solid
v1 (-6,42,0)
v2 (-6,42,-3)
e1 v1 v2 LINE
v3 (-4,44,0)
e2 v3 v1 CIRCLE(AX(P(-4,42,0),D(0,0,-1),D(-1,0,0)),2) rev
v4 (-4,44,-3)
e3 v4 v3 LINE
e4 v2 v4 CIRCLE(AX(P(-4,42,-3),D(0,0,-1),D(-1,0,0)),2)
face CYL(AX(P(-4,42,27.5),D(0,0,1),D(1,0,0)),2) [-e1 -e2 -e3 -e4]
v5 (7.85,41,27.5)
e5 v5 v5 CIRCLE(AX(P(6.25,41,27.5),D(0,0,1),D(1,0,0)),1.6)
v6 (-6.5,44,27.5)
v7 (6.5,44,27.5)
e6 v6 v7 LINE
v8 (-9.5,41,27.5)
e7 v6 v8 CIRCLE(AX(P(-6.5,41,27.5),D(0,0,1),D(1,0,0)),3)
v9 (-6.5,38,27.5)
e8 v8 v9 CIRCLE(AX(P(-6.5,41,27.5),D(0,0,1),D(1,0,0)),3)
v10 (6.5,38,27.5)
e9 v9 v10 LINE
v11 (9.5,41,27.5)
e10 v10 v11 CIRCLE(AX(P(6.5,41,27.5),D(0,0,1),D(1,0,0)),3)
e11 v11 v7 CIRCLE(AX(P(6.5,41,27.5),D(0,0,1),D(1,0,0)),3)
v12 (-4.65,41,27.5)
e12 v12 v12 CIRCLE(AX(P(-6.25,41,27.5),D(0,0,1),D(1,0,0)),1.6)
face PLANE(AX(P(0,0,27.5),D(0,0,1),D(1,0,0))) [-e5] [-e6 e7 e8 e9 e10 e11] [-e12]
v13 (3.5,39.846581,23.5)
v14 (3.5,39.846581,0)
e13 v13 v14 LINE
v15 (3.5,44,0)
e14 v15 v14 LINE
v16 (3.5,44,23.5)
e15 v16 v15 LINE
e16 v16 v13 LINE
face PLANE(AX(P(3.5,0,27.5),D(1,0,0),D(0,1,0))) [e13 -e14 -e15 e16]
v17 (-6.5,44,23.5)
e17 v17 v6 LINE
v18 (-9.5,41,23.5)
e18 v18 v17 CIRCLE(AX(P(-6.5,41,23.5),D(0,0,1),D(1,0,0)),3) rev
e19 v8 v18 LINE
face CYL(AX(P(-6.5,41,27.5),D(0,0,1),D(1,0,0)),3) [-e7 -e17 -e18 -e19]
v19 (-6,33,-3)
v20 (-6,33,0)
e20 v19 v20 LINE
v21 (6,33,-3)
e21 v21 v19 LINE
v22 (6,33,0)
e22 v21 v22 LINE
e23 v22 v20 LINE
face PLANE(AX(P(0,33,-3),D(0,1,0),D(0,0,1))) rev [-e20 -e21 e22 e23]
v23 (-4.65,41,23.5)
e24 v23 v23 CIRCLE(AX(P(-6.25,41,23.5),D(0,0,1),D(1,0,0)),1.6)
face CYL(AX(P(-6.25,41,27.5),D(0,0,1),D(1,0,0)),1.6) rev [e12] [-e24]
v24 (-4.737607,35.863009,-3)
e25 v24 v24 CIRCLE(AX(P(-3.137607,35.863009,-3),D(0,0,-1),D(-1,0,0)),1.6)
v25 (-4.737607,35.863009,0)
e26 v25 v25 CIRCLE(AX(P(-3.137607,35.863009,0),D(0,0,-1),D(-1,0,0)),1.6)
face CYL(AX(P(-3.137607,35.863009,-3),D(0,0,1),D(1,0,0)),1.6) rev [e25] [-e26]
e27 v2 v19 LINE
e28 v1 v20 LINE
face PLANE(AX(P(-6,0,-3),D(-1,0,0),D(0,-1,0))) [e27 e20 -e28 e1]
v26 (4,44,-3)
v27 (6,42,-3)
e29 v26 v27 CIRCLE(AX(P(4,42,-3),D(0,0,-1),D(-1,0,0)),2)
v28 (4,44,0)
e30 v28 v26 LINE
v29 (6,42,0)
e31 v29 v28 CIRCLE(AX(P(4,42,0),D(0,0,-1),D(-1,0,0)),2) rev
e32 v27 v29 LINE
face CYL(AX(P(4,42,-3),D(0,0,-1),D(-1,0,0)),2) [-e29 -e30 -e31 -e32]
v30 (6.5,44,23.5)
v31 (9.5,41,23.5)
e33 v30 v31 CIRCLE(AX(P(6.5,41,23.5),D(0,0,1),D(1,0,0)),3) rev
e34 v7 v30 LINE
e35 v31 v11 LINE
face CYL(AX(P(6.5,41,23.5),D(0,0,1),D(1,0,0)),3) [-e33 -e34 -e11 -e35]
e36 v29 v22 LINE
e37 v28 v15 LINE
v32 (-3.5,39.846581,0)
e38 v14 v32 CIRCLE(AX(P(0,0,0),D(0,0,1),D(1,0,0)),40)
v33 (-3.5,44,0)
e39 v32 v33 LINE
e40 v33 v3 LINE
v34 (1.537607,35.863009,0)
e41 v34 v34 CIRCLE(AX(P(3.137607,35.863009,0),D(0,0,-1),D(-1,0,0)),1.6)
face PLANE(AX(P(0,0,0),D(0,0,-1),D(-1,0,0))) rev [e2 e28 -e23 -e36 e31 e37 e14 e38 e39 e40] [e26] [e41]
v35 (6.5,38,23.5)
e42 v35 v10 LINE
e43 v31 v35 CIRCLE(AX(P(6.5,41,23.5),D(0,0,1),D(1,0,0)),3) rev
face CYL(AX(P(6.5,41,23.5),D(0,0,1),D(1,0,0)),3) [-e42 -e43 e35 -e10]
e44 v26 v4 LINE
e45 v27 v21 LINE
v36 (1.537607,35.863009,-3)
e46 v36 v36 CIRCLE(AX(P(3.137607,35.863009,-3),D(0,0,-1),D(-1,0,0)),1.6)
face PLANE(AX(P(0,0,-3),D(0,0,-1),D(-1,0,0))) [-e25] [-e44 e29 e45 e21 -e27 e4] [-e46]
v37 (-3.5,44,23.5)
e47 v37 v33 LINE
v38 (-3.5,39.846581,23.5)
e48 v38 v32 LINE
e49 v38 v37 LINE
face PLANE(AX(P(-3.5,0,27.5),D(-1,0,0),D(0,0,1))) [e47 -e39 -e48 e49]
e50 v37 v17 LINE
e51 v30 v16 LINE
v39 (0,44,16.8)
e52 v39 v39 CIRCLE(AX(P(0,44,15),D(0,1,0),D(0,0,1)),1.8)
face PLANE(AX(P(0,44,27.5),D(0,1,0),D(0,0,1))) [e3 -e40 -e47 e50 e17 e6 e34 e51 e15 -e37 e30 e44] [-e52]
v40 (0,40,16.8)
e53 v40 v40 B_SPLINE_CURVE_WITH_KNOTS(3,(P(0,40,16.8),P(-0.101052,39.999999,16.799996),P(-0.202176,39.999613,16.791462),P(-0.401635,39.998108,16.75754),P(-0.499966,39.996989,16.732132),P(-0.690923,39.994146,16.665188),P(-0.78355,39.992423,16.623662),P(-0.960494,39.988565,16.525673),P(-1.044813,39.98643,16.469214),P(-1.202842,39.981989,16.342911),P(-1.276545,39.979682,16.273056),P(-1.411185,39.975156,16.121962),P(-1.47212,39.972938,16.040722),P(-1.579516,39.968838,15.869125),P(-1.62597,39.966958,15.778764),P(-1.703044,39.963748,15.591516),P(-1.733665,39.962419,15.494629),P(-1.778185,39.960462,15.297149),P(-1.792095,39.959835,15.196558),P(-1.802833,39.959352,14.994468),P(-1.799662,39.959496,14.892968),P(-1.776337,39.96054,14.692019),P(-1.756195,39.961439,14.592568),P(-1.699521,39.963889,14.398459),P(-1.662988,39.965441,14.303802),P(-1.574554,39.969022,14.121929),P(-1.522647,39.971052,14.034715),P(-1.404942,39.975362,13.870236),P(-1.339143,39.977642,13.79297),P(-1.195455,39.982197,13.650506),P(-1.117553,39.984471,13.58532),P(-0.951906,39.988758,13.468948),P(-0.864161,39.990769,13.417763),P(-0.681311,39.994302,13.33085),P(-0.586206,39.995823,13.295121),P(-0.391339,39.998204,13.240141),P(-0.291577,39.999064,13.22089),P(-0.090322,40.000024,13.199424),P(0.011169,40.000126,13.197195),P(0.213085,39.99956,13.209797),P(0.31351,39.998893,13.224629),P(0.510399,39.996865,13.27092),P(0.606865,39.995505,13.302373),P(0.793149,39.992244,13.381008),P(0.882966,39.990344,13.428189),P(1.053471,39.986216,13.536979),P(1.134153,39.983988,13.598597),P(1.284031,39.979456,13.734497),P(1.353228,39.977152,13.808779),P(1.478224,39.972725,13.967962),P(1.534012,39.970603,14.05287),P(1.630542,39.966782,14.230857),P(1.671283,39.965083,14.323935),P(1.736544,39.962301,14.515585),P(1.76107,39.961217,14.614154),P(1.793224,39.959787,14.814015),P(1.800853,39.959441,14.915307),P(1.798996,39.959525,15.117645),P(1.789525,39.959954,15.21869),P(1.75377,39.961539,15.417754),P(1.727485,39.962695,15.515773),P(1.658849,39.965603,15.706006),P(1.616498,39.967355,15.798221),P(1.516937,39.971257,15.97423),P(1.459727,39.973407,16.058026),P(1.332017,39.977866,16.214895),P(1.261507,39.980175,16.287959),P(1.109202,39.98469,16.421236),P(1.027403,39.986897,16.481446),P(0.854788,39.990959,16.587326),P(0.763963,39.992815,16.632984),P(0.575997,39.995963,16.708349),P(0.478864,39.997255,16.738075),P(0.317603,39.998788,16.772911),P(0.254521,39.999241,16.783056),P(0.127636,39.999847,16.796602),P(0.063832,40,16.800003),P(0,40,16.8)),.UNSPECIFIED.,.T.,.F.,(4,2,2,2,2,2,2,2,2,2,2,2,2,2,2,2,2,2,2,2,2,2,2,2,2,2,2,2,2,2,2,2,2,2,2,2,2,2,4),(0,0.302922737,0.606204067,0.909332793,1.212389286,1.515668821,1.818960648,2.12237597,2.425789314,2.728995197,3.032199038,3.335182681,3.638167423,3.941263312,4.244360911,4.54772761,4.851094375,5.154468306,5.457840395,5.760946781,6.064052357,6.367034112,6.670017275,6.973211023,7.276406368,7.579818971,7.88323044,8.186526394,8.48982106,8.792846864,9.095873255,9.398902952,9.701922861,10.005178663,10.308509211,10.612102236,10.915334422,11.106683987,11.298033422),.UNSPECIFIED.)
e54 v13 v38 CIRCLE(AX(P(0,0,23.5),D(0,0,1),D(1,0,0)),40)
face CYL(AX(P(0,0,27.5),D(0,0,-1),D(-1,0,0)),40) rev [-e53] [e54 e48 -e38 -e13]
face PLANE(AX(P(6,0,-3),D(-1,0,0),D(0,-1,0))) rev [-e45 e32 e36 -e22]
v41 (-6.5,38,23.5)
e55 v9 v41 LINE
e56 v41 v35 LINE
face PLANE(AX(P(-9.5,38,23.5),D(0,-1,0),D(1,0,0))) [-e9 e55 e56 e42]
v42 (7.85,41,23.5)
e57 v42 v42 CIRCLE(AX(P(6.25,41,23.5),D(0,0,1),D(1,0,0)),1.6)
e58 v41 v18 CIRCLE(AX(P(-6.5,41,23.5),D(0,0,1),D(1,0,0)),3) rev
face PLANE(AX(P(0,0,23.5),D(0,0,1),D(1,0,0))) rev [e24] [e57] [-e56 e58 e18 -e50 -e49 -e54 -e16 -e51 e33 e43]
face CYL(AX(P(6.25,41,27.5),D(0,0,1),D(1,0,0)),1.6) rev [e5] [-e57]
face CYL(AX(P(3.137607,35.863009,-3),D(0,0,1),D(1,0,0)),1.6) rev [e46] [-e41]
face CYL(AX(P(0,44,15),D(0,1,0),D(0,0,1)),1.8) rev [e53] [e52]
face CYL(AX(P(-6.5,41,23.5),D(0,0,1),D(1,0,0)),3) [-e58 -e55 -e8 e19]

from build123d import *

# Parameters (mm, degrees)
BOSS_EXTRUDE1_DEPTH      = 27.5
BOSS_EXTRUDE2_START      = 3
BOSS_EXTRUDE2_DEPTH      = 3
SKETCH3_W                = 19
SKETCH3_H                = 6
BOSS_EXTRUDE3_DEPTH      = 4
M3_CLEARANCE_HOLE1_D     = 3.2
M3_CLEARANCE_HOLE1_DEPTH = 4
FILLET1_R                = 3
M3_CLEARANCE_HOLE2_D     = 3.6
FILLET2_R                = 2


with BuildPart() as part:
    # Sketch1 → Boss-Extrude1 (new body)
    with BuildSketch(Plane.XY):
        with BuildLine():
            Line((-3.5, 44), (-3.5, 39.846580782))
            ThreePointArc((-3.5, 39.846580782), (0, 40), (3.5, 39.846580782))
            Line((3.5, 39.846580782), (3.5, 44))
            Line((3.5, 44), (-3.5, 44))
        make_face()
    extrude(amount=BOSS_EXTRUDE1_DEPTH)

    # Sketch2 → Boss-Extrude2 (add)
    with BuildSketch(Plane(origin=(0, 0, 0), x_dir=(-1, 0, 0), z_dir=(0, 0, -1)).offset(BOSS_EXTRUDE2_START)):
        with BuildLine():
            ThreePointArc((-4.728025778, 35.688174123), (-5.364869156, 35.598008075), (-6, 35.496478699))
            Line((-6, 35.496478699), (-6, 33))
            Line((-6, 33), (6, 33))
            Line((6, 33), (6, 35.496478699))
            ThreePointArc((6, 35.496478699), (5.364869156, 35.598008075), (4.728025778, 35.688174123))
            ThreePointArc((4.728025778, 35.688174123), (2.998157551, 34.269097614), (1.540989958, 35.967003628))
            ThreePointArc((1.540989958, 35.967003628), (0, 36), (-1.540989958, 35.967003628))
            ThreePointArc((-1.540989958, 35.967003628), (-1.538452767, 35.915033888), (-1.537606739, 35.863009131))
            ThreePointArc((-1.537606739, 35.863009131), (-3.050058074, 34.265406167), (-4.728025778, 35.688174123))
        make_face()
        with BuildLine():
            Line((-3.5, 44), (-6, 44))
            Line((-6, 44), (-6, 35.496478699))
            ThreePointArc((-6, 35.496478699), (-5.364869156, 35.598008075), (-4.728025778, 35.688174123))
            ThreePointArc((-4.728025778, 35.688174123), (-3.277055927, 37.456920648), (-1.540989958, 35.967003628))
            ThreePointArc((-1.540989958, 35.967003628), (0, 36), (1.540989958, 35.967003628))
            ThreePointArc((1.540989958, 35.967003628), (3.189631496, 37.462163103), (4.737606739, 35.863009131))
            ThreePointArc((4.737606739, 35.863009131), (4.735209703, 35.775460466), (4.728025778, 35.688174123))
            ThreePointArc((4.728025778, 35.688174123), (5.364869156, 35.598008075), (6, 35.496478699))
            Line((6, 35.496478699), (6, 44))
            Line((6, 44), (3.5, 44))
            Line((3.5, 44), (3.5, 39.846580782))
            ThreePointArc((3.5, 39.846580782), (0, 40), (-3.5, 39.846580782))
            Line((-3.5, 39.846580782), (-3.5, 44))
        make_face()
        with BuildLine():
            Line((-3.5, 44), (-3.5, 39.846580782))
            ThreePointArc((-3.5, 39.846580782), (0, 40), (3.5, 39.846580782))
            Line((3.5, 39.846580782), (3.5, 44))
            Line((3.5, 44), (-3.5, 44))
        make_face()
    extrude(amount=-BOSS_EXTRUDE2_DEPTH)

    # Sketch3 → Boss-Extrude3 (add)
    with BuildSketch(Plane.XY.offset(27.5)):
        with Locations((0, 41)):
            Rectangle(SKETCH3_W, SKETCH3_H)
    extrude(amount=-BOSS_EXTRUDE3_DEPTH)

    # M3 Clearance Hole1
    with Locations(Plane.XY.offset(27.5)):
        with Locations((-6.25, 41), (6.25, 41)):
            Hole(M3_CLEARANCE_HOLE1_D / 2, depth=M3_CLEARANCE_HOLE1_DEPTH)

    # Fillet1
    fillet1_edges = [part.edges().sort_by_distance(p)[0] for p in [
        (9.5, 38, 25.5),
        (9.5, 44, 25.5),
        (-9.5, 38, 25.5),
        (-9.5, 44, 25.5),
    ]]
    fillet(fillet1_edges, radius=FILLET1_R - 0.0001)  # a hair under: the kernel refuses the full size

    # M3 Clearance Hole2 (through all)
    with Locations(Plane(origin=(0, 44, 0), x_dir=(1, 0, 0), z_dir=(0, 1, 0))):
        with Locations((0, -15)):
            Hole(M3_CLEARANCE_HOLE2_D / 2)

    # Fillet2
    fillet2_edges = [part.edges().sort_by_distance(p)[0] for p in [
        (-6, 44, -1.5),
        (6, 44, -1.5),
    ]]
    fillet(fillet2_edges, radius=FILLET2_R)


solid = part.part
